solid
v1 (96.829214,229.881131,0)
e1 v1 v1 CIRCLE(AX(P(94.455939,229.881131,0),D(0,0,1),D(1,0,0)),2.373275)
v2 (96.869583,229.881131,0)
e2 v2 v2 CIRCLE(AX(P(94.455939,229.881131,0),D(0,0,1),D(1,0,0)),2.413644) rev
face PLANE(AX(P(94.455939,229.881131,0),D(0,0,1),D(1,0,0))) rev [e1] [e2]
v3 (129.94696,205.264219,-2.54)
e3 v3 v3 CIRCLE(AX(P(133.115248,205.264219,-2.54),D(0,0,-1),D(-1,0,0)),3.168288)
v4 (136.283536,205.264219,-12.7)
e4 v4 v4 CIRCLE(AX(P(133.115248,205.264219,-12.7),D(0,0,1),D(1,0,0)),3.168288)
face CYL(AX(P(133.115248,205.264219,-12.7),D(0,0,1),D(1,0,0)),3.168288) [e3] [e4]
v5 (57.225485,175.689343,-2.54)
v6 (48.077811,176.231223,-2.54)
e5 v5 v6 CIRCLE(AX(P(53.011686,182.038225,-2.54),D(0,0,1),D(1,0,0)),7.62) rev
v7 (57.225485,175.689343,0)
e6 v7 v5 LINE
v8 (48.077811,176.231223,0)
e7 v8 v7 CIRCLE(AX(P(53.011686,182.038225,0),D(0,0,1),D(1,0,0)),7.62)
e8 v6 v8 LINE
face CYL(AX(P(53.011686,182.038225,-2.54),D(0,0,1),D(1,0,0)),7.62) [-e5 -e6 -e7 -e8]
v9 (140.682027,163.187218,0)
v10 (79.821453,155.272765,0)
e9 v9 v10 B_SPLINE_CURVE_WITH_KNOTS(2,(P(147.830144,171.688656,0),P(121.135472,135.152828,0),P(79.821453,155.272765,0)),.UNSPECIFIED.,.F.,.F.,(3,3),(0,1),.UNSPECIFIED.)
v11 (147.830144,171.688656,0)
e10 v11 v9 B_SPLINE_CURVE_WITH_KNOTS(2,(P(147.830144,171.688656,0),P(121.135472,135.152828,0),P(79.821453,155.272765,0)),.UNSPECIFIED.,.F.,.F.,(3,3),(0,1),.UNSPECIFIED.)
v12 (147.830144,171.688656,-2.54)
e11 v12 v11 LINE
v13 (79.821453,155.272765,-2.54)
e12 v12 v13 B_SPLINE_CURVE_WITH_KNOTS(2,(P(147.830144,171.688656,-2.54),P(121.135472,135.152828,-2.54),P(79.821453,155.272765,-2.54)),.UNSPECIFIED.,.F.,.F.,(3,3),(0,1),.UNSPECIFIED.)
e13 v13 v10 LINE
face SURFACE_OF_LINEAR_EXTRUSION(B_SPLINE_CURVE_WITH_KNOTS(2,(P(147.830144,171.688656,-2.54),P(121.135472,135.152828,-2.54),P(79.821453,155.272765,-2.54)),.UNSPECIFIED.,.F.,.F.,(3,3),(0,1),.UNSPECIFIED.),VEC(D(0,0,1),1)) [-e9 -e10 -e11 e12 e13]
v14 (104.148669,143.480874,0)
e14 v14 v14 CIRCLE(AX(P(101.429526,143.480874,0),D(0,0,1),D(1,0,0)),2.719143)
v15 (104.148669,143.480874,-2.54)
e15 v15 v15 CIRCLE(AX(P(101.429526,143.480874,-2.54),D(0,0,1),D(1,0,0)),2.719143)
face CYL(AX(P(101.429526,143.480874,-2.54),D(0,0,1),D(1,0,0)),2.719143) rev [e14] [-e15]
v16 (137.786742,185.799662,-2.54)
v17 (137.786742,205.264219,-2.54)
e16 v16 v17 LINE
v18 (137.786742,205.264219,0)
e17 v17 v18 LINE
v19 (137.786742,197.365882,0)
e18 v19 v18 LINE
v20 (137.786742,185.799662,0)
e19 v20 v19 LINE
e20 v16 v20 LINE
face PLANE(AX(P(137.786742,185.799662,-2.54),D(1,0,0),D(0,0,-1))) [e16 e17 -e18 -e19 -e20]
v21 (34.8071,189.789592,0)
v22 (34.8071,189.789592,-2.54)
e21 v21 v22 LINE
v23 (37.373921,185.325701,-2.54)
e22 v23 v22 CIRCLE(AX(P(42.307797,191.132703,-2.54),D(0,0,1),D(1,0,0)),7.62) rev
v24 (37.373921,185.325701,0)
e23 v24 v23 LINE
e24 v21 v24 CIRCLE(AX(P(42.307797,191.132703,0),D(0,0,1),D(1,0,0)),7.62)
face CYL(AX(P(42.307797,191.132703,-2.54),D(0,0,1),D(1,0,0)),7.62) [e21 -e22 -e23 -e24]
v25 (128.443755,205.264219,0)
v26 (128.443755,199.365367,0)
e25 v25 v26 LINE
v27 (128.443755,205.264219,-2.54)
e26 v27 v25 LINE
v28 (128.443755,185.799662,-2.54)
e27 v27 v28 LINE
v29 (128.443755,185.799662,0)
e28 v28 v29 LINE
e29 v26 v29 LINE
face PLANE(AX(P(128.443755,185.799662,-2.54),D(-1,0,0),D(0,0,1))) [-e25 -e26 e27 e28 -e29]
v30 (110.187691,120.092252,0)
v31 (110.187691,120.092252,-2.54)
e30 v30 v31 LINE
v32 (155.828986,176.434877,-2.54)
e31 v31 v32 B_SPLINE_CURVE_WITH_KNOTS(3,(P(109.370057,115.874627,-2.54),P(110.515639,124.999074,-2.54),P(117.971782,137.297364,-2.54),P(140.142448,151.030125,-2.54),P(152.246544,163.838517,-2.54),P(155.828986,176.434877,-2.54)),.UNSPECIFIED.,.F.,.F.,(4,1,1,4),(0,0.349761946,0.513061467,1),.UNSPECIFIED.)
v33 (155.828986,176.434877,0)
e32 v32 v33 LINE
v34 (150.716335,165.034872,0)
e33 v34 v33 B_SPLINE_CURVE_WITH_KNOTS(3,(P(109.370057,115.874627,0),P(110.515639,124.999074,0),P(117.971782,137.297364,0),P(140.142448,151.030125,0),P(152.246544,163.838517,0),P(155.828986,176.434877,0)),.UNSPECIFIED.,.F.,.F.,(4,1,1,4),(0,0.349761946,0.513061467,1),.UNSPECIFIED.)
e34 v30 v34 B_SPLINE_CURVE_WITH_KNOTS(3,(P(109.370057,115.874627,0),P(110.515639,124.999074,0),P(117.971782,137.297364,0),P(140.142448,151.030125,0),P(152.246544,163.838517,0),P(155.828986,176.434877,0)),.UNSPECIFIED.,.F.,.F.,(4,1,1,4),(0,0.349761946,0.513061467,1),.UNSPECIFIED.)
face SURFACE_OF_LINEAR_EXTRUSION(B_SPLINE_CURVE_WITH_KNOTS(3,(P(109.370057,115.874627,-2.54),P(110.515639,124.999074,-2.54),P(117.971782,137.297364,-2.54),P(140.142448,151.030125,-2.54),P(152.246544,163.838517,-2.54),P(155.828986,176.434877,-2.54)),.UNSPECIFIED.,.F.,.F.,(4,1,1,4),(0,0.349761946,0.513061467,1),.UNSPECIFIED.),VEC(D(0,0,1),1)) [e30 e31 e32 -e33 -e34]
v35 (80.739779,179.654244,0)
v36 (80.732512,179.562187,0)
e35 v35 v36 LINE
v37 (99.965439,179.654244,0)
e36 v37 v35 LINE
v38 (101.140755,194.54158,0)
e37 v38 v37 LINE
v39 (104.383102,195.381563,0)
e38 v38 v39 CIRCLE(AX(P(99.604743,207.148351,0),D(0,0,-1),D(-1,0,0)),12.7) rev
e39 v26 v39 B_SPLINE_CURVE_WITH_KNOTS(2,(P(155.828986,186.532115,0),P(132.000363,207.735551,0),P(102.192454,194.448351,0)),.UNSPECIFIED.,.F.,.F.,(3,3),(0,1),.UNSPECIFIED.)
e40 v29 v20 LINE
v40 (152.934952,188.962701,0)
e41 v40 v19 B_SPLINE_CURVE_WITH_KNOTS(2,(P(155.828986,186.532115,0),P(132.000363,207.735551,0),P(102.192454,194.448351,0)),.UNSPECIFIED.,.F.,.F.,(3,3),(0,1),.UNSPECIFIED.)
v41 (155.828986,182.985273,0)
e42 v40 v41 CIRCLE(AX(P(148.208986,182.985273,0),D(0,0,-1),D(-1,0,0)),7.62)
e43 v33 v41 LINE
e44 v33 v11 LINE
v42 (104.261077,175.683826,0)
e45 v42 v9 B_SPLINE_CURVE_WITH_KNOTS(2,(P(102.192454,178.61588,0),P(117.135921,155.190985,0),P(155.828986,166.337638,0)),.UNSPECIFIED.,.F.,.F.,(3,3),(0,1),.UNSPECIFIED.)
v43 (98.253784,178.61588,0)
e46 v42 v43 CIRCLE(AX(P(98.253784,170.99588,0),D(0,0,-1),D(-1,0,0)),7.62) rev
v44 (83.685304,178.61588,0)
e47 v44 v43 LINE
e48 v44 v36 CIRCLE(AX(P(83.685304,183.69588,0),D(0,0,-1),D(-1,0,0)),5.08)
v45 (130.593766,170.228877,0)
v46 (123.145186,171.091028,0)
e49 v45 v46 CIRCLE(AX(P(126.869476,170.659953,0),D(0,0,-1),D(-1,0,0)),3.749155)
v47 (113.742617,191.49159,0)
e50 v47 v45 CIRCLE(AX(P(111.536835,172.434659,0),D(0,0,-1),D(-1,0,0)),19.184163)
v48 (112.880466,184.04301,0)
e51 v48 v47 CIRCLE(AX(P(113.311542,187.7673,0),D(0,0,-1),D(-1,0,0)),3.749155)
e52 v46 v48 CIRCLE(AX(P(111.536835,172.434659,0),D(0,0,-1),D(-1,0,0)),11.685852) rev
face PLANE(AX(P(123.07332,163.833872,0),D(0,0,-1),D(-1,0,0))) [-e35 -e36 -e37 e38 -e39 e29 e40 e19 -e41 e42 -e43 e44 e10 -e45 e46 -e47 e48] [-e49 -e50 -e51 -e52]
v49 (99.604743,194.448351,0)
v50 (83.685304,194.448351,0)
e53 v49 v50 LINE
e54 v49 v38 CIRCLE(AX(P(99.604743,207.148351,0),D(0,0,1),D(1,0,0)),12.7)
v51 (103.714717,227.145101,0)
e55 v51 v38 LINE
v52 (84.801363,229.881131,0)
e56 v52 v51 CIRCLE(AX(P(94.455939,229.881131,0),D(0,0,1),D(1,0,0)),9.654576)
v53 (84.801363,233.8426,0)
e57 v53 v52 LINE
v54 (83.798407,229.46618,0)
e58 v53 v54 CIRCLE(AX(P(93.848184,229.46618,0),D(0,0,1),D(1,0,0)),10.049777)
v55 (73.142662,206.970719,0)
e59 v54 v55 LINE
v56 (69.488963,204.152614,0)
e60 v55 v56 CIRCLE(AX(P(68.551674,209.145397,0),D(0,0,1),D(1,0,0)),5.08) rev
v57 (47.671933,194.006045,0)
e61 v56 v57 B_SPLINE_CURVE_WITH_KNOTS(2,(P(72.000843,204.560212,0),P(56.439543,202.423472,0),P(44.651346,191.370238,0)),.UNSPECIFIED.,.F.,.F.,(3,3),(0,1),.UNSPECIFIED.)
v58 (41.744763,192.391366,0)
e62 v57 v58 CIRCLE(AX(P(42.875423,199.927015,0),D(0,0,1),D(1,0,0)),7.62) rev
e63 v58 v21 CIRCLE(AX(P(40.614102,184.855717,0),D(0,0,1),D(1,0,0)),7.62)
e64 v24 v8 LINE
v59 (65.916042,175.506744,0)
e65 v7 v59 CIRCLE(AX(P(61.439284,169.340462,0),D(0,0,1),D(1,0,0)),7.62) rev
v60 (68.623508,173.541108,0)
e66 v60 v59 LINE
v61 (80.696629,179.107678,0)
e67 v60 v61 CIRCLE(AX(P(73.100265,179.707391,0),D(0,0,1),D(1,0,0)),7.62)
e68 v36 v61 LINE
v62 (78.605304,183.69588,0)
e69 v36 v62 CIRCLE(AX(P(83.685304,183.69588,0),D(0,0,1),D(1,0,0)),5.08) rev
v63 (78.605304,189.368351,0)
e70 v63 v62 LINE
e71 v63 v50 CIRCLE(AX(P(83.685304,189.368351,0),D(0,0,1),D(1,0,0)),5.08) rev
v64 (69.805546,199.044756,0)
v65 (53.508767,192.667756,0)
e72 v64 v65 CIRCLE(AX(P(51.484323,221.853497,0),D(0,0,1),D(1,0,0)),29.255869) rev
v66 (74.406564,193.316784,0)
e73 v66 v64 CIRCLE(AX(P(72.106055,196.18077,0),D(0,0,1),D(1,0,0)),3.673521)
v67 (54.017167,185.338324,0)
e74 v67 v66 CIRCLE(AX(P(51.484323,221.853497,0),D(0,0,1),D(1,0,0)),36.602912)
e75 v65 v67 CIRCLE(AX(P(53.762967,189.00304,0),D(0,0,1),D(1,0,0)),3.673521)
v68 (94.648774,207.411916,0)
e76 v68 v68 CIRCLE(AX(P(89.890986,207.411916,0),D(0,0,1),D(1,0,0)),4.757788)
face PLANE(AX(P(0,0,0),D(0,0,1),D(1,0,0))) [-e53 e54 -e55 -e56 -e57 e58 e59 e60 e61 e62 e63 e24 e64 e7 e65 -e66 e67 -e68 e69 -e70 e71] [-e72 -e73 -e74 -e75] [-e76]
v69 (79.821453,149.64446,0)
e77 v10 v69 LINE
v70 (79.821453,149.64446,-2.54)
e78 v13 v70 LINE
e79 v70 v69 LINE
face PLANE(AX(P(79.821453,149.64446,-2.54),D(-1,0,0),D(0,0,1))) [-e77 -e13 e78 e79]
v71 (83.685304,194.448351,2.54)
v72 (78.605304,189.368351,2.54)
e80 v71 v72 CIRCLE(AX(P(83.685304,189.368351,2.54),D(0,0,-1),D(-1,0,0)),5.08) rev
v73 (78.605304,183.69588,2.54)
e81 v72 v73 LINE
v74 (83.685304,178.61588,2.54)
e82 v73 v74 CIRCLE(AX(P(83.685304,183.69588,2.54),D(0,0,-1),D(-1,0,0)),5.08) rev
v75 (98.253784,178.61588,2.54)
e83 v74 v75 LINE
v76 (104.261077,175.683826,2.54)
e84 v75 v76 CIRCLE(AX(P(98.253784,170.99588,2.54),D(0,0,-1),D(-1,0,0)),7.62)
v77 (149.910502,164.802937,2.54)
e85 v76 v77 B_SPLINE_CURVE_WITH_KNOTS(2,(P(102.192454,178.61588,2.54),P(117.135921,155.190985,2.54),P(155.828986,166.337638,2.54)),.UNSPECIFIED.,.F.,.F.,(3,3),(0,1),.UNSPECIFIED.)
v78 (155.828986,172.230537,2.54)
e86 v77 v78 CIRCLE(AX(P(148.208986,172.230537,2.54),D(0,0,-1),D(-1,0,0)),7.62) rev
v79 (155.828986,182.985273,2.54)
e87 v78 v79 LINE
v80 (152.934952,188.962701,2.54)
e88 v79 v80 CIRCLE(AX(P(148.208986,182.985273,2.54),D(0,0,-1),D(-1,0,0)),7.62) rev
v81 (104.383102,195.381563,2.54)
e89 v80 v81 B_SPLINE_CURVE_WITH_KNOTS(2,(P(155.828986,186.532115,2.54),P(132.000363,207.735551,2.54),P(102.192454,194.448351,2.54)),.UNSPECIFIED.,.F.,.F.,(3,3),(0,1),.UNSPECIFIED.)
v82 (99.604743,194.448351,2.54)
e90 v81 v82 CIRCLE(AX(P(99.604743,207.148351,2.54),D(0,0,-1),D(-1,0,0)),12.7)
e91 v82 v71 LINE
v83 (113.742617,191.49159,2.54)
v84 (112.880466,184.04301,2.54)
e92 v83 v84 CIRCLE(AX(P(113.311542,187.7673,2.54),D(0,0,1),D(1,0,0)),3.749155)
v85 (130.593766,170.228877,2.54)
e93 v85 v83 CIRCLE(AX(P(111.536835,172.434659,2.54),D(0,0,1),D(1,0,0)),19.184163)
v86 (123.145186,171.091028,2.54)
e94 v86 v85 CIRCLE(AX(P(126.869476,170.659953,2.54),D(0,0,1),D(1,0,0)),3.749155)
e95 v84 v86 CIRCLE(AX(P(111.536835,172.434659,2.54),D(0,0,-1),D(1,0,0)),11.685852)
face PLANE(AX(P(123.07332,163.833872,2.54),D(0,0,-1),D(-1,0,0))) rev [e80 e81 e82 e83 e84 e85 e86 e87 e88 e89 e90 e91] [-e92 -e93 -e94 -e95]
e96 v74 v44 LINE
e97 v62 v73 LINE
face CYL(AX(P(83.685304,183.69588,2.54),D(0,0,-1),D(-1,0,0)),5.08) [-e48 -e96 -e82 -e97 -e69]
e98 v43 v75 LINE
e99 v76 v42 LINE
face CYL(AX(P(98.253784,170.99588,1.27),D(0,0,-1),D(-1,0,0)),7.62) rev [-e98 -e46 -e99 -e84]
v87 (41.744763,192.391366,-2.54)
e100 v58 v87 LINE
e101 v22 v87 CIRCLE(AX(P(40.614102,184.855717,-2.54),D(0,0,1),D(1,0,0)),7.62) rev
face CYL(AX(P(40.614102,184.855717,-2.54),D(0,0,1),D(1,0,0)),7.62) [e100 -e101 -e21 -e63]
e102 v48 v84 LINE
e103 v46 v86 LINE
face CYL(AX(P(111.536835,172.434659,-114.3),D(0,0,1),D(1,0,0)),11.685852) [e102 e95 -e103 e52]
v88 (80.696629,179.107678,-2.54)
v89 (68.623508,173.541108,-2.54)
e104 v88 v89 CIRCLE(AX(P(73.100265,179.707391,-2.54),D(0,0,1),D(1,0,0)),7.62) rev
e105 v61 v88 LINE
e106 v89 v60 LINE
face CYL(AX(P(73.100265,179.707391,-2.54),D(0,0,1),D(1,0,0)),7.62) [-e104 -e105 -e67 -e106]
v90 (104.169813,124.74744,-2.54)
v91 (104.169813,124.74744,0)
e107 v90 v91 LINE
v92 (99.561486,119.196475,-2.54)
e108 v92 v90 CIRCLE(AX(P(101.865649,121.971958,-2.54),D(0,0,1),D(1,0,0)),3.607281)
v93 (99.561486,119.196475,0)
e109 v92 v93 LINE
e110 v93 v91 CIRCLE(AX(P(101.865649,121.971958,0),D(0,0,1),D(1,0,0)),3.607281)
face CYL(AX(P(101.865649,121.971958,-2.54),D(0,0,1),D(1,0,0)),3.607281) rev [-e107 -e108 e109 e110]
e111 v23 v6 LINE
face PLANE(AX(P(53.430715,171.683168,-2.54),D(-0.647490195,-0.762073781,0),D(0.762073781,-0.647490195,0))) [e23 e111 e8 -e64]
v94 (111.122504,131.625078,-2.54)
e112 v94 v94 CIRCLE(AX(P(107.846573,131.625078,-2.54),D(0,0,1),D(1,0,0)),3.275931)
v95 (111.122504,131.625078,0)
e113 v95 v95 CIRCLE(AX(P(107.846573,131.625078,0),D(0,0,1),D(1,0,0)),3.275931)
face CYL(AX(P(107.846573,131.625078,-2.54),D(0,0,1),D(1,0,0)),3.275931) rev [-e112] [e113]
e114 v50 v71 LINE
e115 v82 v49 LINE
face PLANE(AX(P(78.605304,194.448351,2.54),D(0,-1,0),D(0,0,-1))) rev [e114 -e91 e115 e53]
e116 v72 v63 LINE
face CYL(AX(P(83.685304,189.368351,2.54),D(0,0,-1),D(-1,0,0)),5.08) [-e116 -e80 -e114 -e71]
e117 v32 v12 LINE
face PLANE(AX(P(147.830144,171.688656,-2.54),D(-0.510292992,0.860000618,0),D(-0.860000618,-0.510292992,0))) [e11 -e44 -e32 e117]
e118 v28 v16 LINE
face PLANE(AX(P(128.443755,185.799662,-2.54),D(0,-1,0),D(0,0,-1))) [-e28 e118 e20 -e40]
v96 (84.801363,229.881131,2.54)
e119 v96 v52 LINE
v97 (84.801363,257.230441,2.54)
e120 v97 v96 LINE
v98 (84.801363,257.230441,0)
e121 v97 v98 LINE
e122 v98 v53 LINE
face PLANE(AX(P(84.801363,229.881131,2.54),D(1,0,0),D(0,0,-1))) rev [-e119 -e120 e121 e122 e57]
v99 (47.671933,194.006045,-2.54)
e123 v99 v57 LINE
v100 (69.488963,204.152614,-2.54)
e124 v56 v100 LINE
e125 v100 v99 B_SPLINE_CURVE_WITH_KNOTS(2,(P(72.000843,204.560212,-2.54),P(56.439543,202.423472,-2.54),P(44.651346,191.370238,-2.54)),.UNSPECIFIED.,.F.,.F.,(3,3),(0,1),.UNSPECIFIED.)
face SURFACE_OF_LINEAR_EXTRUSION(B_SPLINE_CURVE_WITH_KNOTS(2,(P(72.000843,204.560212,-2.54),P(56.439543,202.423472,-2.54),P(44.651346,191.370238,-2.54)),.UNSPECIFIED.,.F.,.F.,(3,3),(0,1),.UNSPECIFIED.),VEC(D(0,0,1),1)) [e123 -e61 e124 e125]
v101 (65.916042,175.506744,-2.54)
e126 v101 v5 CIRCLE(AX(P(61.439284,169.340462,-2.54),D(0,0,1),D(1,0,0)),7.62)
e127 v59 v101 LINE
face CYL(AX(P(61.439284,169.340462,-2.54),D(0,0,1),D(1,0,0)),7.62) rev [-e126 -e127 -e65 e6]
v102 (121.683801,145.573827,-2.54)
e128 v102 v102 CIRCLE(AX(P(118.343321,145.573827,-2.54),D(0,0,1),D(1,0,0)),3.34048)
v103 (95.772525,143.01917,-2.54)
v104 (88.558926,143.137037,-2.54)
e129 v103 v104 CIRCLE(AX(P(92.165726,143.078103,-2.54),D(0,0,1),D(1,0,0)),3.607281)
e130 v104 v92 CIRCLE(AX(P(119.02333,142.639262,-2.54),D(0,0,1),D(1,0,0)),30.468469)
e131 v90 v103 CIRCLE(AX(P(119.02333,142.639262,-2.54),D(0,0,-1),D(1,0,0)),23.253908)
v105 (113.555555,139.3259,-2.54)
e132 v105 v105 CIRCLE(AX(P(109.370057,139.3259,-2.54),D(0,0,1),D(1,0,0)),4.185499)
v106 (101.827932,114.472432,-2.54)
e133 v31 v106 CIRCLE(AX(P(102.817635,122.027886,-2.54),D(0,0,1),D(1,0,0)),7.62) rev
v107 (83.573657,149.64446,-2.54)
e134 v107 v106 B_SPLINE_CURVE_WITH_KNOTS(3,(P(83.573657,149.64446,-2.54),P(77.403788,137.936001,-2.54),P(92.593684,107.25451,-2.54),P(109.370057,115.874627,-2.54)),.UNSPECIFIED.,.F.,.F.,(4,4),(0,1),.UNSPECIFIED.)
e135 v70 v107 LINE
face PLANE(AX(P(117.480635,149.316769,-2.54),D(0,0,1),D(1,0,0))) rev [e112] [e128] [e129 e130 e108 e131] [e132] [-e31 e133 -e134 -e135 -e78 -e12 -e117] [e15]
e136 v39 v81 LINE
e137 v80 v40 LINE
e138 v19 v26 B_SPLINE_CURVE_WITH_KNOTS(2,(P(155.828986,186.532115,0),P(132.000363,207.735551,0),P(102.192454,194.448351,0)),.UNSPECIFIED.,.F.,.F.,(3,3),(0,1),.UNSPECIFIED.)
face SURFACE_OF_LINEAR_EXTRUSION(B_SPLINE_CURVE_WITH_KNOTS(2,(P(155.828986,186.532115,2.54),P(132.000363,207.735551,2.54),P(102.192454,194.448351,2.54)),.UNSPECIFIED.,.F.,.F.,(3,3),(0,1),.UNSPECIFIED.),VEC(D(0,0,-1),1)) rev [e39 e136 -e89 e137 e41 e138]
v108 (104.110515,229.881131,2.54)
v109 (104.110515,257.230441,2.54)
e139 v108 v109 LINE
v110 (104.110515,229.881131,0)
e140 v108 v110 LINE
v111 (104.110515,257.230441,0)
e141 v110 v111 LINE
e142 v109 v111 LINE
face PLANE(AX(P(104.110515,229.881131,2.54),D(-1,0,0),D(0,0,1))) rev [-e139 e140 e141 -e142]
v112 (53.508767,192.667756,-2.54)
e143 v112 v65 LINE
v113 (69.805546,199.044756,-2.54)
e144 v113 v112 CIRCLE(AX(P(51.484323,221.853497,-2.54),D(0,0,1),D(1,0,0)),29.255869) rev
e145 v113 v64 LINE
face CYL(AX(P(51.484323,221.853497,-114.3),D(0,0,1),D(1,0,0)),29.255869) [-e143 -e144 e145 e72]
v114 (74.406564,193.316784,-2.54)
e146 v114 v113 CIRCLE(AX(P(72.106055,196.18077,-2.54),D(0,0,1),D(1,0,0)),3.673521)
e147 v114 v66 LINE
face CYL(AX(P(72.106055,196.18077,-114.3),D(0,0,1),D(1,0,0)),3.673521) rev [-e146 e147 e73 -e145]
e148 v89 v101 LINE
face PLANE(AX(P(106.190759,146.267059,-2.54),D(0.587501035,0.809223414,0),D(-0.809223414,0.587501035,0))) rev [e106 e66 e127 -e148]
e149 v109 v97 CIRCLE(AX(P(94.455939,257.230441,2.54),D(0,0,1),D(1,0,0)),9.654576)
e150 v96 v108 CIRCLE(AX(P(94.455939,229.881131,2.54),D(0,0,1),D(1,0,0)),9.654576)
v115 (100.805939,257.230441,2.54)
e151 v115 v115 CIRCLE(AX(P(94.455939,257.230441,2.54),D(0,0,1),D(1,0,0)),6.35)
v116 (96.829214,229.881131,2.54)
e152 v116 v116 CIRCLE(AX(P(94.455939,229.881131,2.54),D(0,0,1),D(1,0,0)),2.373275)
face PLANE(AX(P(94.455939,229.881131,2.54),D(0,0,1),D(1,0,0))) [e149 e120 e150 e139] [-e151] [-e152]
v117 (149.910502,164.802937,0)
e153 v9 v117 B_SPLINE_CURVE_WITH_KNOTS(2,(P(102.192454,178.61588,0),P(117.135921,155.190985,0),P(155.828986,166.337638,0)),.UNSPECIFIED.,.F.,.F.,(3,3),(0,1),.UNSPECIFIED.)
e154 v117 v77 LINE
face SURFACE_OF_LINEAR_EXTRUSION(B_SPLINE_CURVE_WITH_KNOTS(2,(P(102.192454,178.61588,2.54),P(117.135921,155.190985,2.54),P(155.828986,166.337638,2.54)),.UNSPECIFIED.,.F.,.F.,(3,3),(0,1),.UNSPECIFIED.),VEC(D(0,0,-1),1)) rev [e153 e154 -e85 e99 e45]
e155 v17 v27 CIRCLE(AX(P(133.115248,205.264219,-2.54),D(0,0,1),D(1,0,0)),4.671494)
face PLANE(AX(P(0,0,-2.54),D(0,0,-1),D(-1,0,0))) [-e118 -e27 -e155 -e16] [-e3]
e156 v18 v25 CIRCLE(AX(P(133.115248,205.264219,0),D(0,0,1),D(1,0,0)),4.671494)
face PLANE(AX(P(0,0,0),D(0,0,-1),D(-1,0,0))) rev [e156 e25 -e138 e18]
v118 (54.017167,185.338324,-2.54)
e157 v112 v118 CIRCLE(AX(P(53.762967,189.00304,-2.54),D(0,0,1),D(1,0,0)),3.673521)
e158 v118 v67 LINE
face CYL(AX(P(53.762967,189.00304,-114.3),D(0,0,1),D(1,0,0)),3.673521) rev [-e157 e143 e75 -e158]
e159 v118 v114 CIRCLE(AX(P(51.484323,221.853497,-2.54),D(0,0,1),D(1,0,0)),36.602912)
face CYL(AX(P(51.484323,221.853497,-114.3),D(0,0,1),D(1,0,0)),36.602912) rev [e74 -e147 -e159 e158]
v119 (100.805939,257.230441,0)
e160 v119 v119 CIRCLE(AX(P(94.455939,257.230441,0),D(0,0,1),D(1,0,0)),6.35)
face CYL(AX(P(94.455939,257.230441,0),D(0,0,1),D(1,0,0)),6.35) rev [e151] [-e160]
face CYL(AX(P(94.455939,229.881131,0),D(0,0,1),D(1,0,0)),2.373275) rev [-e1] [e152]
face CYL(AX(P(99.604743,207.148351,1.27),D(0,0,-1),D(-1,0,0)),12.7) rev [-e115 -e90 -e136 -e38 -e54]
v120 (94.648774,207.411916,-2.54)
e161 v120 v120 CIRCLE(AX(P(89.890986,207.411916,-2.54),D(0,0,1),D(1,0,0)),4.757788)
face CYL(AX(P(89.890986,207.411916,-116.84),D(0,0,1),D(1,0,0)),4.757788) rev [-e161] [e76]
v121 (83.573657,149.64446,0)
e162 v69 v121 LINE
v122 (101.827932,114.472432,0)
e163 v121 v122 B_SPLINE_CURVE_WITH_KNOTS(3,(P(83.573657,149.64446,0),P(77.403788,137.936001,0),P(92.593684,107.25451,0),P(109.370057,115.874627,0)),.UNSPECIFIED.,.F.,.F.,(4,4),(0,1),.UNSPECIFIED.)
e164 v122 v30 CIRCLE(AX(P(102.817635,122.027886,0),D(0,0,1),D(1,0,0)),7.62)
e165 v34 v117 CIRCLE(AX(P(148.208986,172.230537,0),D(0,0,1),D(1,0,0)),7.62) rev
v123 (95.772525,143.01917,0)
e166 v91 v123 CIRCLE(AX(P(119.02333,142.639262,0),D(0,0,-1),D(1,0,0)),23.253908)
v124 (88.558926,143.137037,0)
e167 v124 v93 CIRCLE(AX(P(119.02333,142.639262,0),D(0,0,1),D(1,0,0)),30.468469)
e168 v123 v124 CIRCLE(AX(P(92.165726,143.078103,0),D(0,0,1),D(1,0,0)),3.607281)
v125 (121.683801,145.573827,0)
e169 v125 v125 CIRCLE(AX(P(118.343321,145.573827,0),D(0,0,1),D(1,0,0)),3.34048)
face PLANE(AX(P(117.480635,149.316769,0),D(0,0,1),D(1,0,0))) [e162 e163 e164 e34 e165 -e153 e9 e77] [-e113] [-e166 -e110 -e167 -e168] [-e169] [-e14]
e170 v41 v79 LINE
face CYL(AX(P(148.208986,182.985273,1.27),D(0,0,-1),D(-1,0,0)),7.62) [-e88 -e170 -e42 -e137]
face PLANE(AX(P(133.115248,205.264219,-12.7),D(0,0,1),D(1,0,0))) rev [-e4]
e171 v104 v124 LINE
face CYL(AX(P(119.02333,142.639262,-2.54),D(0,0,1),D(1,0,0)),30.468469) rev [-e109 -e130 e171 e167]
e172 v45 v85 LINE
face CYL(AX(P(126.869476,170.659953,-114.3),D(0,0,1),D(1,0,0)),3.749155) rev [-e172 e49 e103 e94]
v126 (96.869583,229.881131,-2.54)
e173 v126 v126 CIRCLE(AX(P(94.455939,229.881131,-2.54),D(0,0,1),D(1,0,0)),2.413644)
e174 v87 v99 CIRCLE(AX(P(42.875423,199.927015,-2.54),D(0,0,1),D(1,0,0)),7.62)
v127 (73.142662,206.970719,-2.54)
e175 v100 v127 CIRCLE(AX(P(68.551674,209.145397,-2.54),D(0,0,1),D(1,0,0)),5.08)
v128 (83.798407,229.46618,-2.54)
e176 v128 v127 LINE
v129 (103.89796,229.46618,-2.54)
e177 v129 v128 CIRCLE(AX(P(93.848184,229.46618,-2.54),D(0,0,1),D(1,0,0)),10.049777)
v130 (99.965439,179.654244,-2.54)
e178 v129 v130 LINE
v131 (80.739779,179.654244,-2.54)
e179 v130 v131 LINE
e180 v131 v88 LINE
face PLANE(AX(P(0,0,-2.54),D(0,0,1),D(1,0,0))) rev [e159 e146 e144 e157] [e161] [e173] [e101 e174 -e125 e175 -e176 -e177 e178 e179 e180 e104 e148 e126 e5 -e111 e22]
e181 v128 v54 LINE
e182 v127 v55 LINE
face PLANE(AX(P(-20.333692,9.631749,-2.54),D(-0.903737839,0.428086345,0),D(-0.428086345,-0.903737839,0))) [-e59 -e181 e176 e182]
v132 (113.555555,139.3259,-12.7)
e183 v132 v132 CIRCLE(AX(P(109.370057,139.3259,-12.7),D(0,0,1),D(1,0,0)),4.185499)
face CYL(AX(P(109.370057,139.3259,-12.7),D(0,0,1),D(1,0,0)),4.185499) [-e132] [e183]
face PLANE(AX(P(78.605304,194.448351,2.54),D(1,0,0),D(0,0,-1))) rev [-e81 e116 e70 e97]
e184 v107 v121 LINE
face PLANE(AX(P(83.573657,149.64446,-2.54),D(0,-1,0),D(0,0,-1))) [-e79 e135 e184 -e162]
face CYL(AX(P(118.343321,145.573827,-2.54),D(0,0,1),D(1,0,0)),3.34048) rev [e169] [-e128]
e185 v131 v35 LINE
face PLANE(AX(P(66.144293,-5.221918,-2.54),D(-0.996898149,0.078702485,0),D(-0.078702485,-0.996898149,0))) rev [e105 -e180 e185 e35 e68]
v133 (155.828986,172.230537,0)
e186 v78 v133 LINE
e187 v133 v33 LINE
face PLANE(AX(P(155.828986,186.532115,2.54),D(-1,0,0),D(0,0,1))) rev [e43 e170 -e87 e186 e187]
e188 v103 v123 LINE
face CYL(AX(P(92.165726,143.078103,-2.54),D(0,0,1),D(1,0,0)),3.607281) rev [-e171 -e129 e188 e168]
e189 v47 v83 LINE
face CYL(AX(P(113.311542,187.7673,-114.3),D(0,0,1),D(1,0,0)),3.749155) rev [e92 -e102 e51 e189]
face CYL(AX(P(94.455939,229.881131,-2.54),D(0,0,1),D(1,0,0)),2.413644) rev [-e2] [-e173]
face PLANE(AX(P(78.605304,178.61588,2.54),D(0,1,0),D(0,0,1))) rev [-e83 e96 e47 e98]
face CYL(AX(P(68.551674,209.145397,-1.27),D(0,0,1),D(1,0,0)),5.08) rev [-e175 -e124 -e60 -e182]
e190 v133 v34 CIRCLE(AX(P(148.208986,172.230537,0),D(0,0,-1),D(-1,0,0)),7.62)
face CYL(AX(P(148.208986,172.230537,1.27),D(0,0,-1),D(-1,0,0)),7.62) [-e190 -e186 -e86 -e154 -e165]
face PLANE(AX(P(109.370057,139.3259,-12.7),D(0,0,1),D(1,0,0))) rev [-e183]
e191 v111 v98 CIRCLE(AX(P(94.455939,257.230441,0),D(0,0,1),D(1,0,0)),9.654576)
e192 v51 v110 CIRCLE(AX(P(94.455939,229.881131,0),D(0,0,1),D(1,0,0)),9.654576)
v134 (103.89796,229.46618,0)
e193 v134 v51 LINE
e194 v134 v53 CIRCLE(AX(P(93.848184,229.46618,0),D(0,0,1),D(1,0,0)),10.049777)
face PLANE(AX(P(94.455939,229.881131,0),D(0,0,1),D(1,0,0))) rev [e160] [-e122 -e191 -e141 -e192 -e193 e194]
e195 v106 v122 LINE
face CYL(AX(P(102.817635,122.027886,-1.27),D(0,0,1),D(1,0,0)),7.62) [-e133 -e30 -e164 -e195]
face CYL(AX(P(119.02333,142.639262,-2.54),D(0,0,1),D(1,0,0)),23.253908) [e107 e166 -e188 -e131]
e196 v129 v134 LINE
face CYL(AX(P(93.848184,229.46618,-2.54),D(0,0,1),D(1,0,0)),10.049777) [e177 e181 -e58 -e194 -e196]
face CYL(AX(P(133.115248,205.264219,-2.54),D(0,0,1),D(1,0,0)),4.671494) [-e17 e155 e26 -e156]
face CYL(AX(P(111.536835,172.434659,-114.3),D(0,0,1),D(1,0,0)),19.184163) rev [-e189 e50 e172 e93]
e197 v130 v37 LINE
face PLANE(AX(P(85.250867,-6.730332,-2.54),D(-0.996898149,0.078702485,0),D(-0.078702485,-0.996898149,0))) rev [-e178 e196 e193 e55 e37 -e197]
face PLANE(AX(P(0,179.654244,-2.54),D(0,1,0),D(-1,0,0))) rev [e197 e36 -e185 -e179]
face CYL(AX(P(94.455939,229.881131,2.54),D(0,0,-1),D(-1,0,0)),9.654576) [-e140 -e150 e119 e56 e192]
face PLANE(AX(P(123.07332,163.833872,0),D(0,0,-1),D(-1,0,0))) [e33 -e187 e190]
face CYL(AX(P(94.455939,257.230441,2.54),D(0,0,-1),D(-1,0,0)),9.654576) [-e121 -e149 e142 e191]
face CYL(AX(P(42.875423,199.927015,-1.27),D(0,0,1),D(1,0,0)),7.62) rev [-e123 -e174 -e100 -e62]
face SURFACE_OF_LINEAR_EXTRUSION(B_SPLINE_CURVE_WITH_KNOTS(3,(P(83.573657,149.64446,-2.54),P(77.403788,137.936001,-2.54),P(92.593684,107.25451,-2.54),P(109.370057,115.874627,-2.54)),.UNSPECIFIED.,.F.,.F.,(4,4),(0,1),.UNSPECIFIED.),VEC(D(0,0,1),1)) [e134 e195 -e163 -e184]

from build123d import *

# Parameters (mm, degrees)
BOSS_EXTRUDE1_DEPTH = 2.54
BOSS_EXTRUDE2_DEPTH = 2.54
SKETCH4_R           = 3.752203663949133
BOSS_EXTRUDE3_DEPTH = 2.54
SKETCH5_W           = 9.342987123233343
SKETCH5_H           = 19.464556506736216
BOSS_EXTRUDE4_DEPTH = 2.54
SKETCH6_R           = 4.671493561616677
BOSS_EXTRUDE5_DEPTH = 2.54
SKETCH7_R           = 1.325280210362921
CUT_EXTRUDE1_DEPTH  = 2.54
BOSS_EXTRUDE6_DEPTH = 2.54
SKETCH9_R           = 2.413643935948342
CUT_EXTRUDE2_DEPTH  = 2.54
BOSS_EXTRUDE7_DEPTH = 2.54
SKETCH12_R          = 6.349999999999994
CUT_EXTRUDE3_DEPTH  = 2.54
SKETCH13_R          = 2.373275093168991
CUT_EXTRUDE4_DEPTH  = 2.54
SKETCH14_R          = 3.1682877443280404
BOSS_EXTRUDE8_DEPTH = 12.699999999999996
SKETCH15_R          = 4.185498605643885
BOSS_EXTRUDE9_DEPTH = 12.699999999999996
FILLET1_R           = 5.08
FILLET2_R           = 5.08
FILLET3_R           = 7.62
FILLET4_R           = 7.62
FILLET5_R           = 12.7
FILLET6_R           = 7.62
FILLET7_R           = 7.62
FILLET8_R           = 7.62
FILLET9_R           = 7.62
FILLET10_R          = 7.62
CUT_EXTRUDE5_DEPTH  = 116.84000000000003
SKETCH17_R          = 4.757787793991487
SKETCH17_R_2        = 3.9759258529414856
CUT_EXTRUDE6_DEPTH  = 116.84000000000003
SKETCH18_R          = 3.3404799409440606
SKETCH18_R_2        = 3.275931204973612
SKETCH18_R_3        = 2.7191431381646294
CUT_EXTRUDE7_DEPTH  = 2.54


with BuildPart() as part:
    # Sketch2 → Boss-Extrude1 (new body)
    with BuildSketch(Plane.XY):
        with BuildLine():
            Line((103.77346184597248, 227.8892023486803), (103.8979601103844, 229.46618036456462))
            ThreePointArc((103.89796011038442, 229.46618036456462), (93.8481835442449, 239.51595693070414), (83.79840697810539, 229.46618036456462))
            Line((83.79840697810539, 229.46618036456462), (60.20327938803871, 179.65424434109062))
            Line((60.20327938803871, 179.65424434109062), (79.62651223852446, 165.55286121354592))
            Line((79.62651223852446, 165.55286121354592), (80.73977932754117, 179.65424434109053))
            Line((80.73977932754117, 179.65424434109053), (99.9654388453732, 179.65424434109056))
            Line((99.9654388453732, 179.65424434109056), (103.77346184597248, 227.8892023486803))
        make_face()
    extrude(amount=-BOSS_EXTRUDE1_DEPTH)

    # Sketch3 → Boss-Extrude2 (add)
    with BuildSketch(Plane.XY):
        with BuildLine():
            Line((155.82898557173152, 186.53211543759366), (155.82898557173152, 166.33763806185485))
            add(Edge.make_bspline(
                [(102.19245366176918, 178.61588030630404), (117.13592129843231, 155.19098509207532), (155.82898557173152, 166.33763806185485)],
                knots=[0, 0, 0, 1, 1, 1], degree=2))
            Line((102.19245366176918, 178.61588030630404), (78.60530408690622, 178.61588030630404))
            Line((78.60530408690622, 178.61588030630404), (78.60530408690622, 194.44835056888326))
            Line((78.60530408690622, 194.44835056888326), (102.19245366176918, 194.44835056888326))
            add(Edge.make_bspline(
                [(102.19245366176918, 194.44835056888326), (132.00036256606023, 207.73555116297914), (155.82898557173152, 186.53211543759366)],
                knots=[0, 0, 0, 1, 1, 1], degree=2))
        make_face()
    extrude(amount=BOSS_EXTRUDE2_DEPTH)

    # Sketch4 → Boss-Extrude3 (add)
    with BuildSketch(Plane.XY):
        with BuildLine():
            Line((83.57365654515331, 149.6444596246894), (79.82145288120418, 149.6444596246894))
            Line((79.82145288120418, 149.6444596246894), (79.82145288120418, 155.27276512061312))
            add(Edge.make_bspline(
                [(147.83014429028253, 171.68865615039067), (121.13547228987983, 135.15282767492383), (79.82145288120418, 155.27276512061312)],
                knots=[0, 0, 0, 1, 1, 1], degree=2))
            Line((147.83014429028253, 171.68865615039067), (155.82898557173152, 176.43487674972425))
            add(Edge.make_bspline(
                [(155.82898557173152, 176.43487674972425), (152.24654443646537, 163.8385168089645), (140.14244762403558, 151.03012493854882), (117.9717822507304, 137.2973644996843), (110.51563949256088, 124.99907391139158), (109.37005673480373, 115.874626649147)],
                knots=[0, 0, 0, 0, 0.4869385329698446, 0.6502380535718314, 1, 1, 1, 1], degree=3))
            add(Edge.make_bspline(
                [(109.37005673480373, 115.874626649147), (92.59368388223713, 107.25450975508488), (77.4037881660434, 137.93600075089722), (83.57365654515331, 149.6444596246894)],
                knots=[0, 0, 0, 0, 1, 1, 1, 1], degree=3))
        make_face()
        with Locations((109.37005673480374, 139.32589954882923)):
            Circle(SKETCH4_R, mode=Mode.SUBTRACT)
        with BuildLine():
            ThreePointArc((88.55892647954366, 143.1370366742894), (91.33858373499741, 129.91595744255534), (99.56148602237059, 119.19647478330826))
            ThreePointArc((99.56148602237059, 119.19647478330826), (104.64113222666154, 119.66779421852958), (104.16981279144024, 124.74744042282053))
            ThreePointArc((104.16981279144024, 124.74744042282053), (97.89399330260235, 132.92868055338437), (95.77252492484313, 143.01916975126733))
            ThreePointArc((95.77252492484313, 143.01916975126733), (92.22465916370442, 146.6849024354281), (88.55892647954366, 143.1370366742894))
        make_face(mode=Mode.SUBTRACT)
    extrude(amount=-BOSS_EXTRUDE3_DEPTH)

    # Sketch5 → Boss-Extrude4 (add)
    with BuildSketch(Plane.XY):
        with Locations((133.11524820639553, 195.53194055525648)):
            Rectangle(SKETCH5_W, SKETCH5_H)
    extrude(amount=-BOSS_EXTRUDE4_DEPTH)

    # Sketch6 → Boss-Extrude5 (add)
    with BuildSketch(Plane.XY):
        with Locations((133.11524820639553, 205.2642188086246)):
            Circle(SKETCH6_R)
    extrude(amount=-BOSS_EXTRUDE5_DEPTH)

    # Sketch7 → Cut-Extrude1 (cut)
    with BuildSketch(Plane.XY):
        with Locations((133.11524820639553, 205.2642188086246)):
            Circle(SKETCH7_R)
    extrude(amount=-CUT_EXTRUDE1_DEPTH, mode=Mode.SUBTRACT)

    # Sketch8 → Boss-Extrude6 (add)
    with BuildSketch(Plane.XY):
        with BuildLine():
            Line((53.43071516454814, 171.68316822779136), (33.68058159040789, 188.46371907841157))
            Line((33.68058159040789, 188.46371907841157), (38.612605943121544, 194.2685428070323))
            Line((38.612605943121544, 194.2685428070323), (44.65134602108127, 191.37023842829282))
            add(Edge.make_bspline(
                [(72.00084318307205, 204.56021235282762), (56.43954312103958, 202.4234723925359), (44.65134602108127, 191.37023842829282)],
                knots=[0, 0, 0, 1, 1, 1], degree=2))
            Line((72.00084318307205, 204.56021235282762), (60.20327938803871, 179.65424434109062))
            add(Edge.make_bspline(
                [(60.20327938803871, 179.65424434109062), (56.81699727629342, 175.668706284441), (53.43071516454814, 171.68316822779136)],
                knots=[0, 0, 0, 1, 1, 1], degree=2))
        make_face()
    extrude(amount=-BOSS_EXTRUDE6_DEPTH)

    # Sketch9 → Cut-Extrude2 (cut)
    with BuildSketch(Plane.XY):
        with Locations((94.4559388798138, 229.88113108062512)):
            Circle(SKETCH9_R)
    extrude(amount=-CUT_EXTRUDE2_DEPTH, mode=Mode.SUBTRACT)

    # Sketch11 → Boss-Extrude7 (add)
    with BuildSketch(Plane.XY):
        with BuildLine():
            Line((84.80136313602057, 229.88113108062512), (84.80136313602057, 257.23044134716133))
            ThreePointArc((84.80136313602057, 257.23044134716133), (94.4559388798138, 266.88501709095453), (104.11051462360702, 257.23044134716133))
            Line((104.11051462360702, 257.23044134716133), (104.11051462360702, 229.88113108062512))
            ThreePointArc((104.11051462360702, 229.88113108062512), (94.4559388798138, 220.2265553368319), (84.80136313602057, 229.88113108062512))
        make_face()
    extrude(amount=BOSS_EXTRUDE7_DEPTH)

    # Sketch12 → Cut-Extrude3 (cut)
    with BuildSketch(Plane.XY.offset(2.54)):
        with Locations((94.4559388798138, 257.23044134716133)):
            Circle(SKETCH12_R)
    extrude(amount=-CUT_EXTRUDE3_DEPTH, mode=Mode.SUBTRACT)

    # Sketch13 → Cut-Extrude4 (cut)
    with BuildSketch(Plane.XY.offset(2.54)):
        with Locations((94.4559388798138, 229.88113108062512)):
            Circle(SKETCH13_R)
    extrude(amount=-CUT_EXTRUDE4_DEPTH, mode=Mode.SUBTRACT)

    # Sketch14 → Boss-Extrude8 (add)
    with BuildSketch(Plane.XY):
        with Locations((133.11524820639553, 205.2642188086246)):
            Circle(SKETCH14_R)
    extrude(amount=-BOSS_EXTRUDE8_DEPTH)

    # Sketch15 → Boss-Extrude9 (add)
    with BuildSketch(Plane.XY):
        with Locations((109.37005673480374, 139.32589954882923)):
            Circle(SKETCH15_R)
    extrude(amount=-BOSS_EXTRUDE9_DEPTH)

    # Fillet1
    # the kernel refuses this fillet: 5.08 mm, written as the material it takes off along each edge
    with BuildSketch(Plane(origin=(78.60530408690622, 194.44835056888326, 0), x_dir=(1, 0, 0), z_dir=(0, 0, 1))) as fillet1_piece_1:
        with BuildLine():
            CenterArc((FILLET1_R, -FILLET1_R), FILLET1_R, 90, 90)
            Line((0, -FILLET1_R), (0, 0))
            Line((0, 0), (FILLET1_R, 0))
        make_face()
    extrude(amount=15.240000000000032, mode=Mode.SUBTRACT)
    with BuildSketch(Plane(origin=(78.60530408690622, 178.61588030630404, 0), x_dir=(0, 1, 0), z_dir=(0, 0, 1))) as fillet1_piece_2:
        with BuildLine():
            CenterArc((FILLET1_R, -FILLET1_R), FILLET1_R, 90, 90)
            Line((0, -FILLET1_R), (0, 0))
            Line((0, 0), (FILLET1_R, 0))
        make_face()
    extrude(amount=15.240000000000032, mode=Mode.SUBTRACT)

    # Fillet2
    fillet2_edges = [part.edges().sort_by_distance(p)[0] for p in [
        (72.00084318307205, 204.56021235282762, -1.27),
    ]]
    fillet(fillet2_edges, radius=FILLET2_R)

    # Fillet3
    fillet3_edges = [part.edges().sort_by_distance(p)[0] for p in [
        (79.62651223852446, 165.55286121354592, -1.27),
        (60.20327938803871, 179.65424434109062, -1.27),
    ]]
    fillet(fillet3_edges, radius=FILLET3_R)

    # Fillet4
    fillet4_edges = [part.edges().sort_by_distance(p)[0] for p in [
        (102.19245366176918, 178.61588030630404, 1.27),
    ]]
    fillet(fillet4_edges, radius=FILLET4_R)

    # Fillet5
    # the kernel refuses this fillet: 12.7 mm, written as the material it adds along each edge
    with BuildSketch(Plane(origin=(102.19245366176918, 194.44835056888326, 0), x_dir=(-1, 0, 0), z_dir=(0, 0, 1))) as fillet5_piece_1:
        with BuildLine():
            CenterArc((2.5877110332677518, -12.699999999999989), FILLET5_R, 90, 22.101513861173345)
            Line((-2.1906480107007127, -0.9332126369630771), (-2.2862151915800837, -0.6978768897023429))
            ThreePointArc((-2.2862151915800837, -0.6978768897023429), (-1.190974963774508, -0.2421295183060579), (-0.10341414363983858, 0.23199464410896553))
            Line((-0.10341414363983858, 0.23199464410896553), (0, 0.2539999999999907))
            Line((0, 0.2539999999999907), (2.5877110332677518, 0.2539999999999907))
            Line((2.5877110332677518, 0.2539999999999907), (2.5877110332677518, 0))
        make_face()
    extrude(amount=2.54)

    # Fillet6
    # the kernel refuses this fillet: 7.62 mm, written as the material it takes off along each edge
    with BuildSketch(Plane(origin=(155.82898557173152, 166.33763806185485, 0), x_dir=(-0.9679857951483454, -0.25100498080919764, 0), z_dir=(0, 0, 1))) as fillet6_piece_1:
        with BuildLine():
            CenterArc((5.896904780664992, -7.616900393013502), FILLET6_R, 88.36571353920408, 77.09729672812531)
            Line((-1.4791469783654112, -5.704242439247442), (-1.6266680135460192, -5.665989280172121))
            Line((-1.6266680135460192, -5.665989280172121), (-0.1475210351806079, 0.03825315907532174))
            Line((-0.1475210351806079, 0.03825315907532174), (-0.00407865923253817, 0.15234541193900156))
            ThreePointArc((-0.00407865923253817, 0.15234541193900156), (3.057027412711964, 0.19461408438494718), (6.118572167505086, 0.15233800786026397))
            Line((6.118572167505086, 0.15233800786026397), (6.114225748155272, -3e-17))
        make_face()
    extrude(amount=2.54, mode=Mode.SUBTRACT)
    with BuildSketch(Plane(origin=(155.82898557173152, 186.53211543759366, 0), x_dir=(0, -1, 0), z_dir=(0, 0, 1))) as fillet6_piece_2:
        with BuildLine():
            CenterArc((3.546842511676118, -7.6200000000000045), FILLET6_R, 90, 51.66885560817448)
            Line((-2.430585411298921, -2.8940339161565873), (-2.550133969758434, -2.7995145944797173))
            ThreePointArc((-2.550133969758434, -2.7995145944797173), (-1.353004934943982, -1.3313000635790786), (-0.11385193149305906, 0.10130892209127751))
            Line((-0.11385193149305906, 0.10130892209127751), (0, 0.1524000000000001))
            Line((0, 0.1524000000000001), (3.546842511676118, 0.1524000000000001))
            Line((3.546842511676118, 0.1524000000000001), (3.546842511676118, 0))
        make_face()
    extrude(amount=2.54, mode=Mode.SUBTRACT)

    # Fillet7
    fillet7_edges = [part.edges().sort_by_distance(p)[0] for p in [
        (38.612605943121544, 194.2685428070323, -1.27),
    ]]
    fillet(fillet7_edges, radius=FILLET7_R)

    # Fillet8
    # the kernel refuses this fillet: 7.62 mm, written as the material it takes off along each edge
    with BuildSketch(Plane(origin=(33.68058159040789, 188.46371907841157, 12.116083147258706), x_dir=(0.6474901947470975, 0.7620737810122887, 0), z_dir=(0, 0, -1))) as fillet8_piece_1:
        with BuildLine():
            CenterArc((7.620000000000027, 4.846433258903447), FILLET8_R, 179.99999999999974, 39.495295691095976)
            Line((3.16e-14, 4.846433258903483), (-0.15239999999997533, 4.846433258903493))
            Line((-0.15239999999997533, 4.846433258903493), (-0.15240000000000672, 1.022e-14))
            Line((-0.15240000000000672, 1.022e-14), (4.39e-15, -0.1524000000000005))
            ThreePointArc((4.39e-15, -0.1524000000000005), (0.8699113675352202, -0.15239999999999398), (1.6222191897718603, -0.0969286651780648))
            Line((1.6222191897718603, -0.0969286651780648), (1.7398227350704578, 5e-17))
        make_face()
    extrude(amount=26.77216629451741, mode=Mode.SUBTRACT)
    with BuildSketch(Plane(origin=(53.43071516454814, 171.68316822779136, 17.560321988836655), x_dir=(-0.762073781012292, 0.6474901947470937, 0), z_dir=(0, 0, -1))) as fillet8_piece_2:
        with BuildLine():
            CenterArc((7.024128795534659, 7.619999999999995), FILLET8_R, 196.07483951798156, 73.92516048201844)
            Line((-0.29793560223265597, 5.510077500250723), (-1.0301420420093952, 5.299085250275792))
            ThreePointArc((-1.0301420420093952, 5.299085250275792), (-0.7620000000000109, 3.4001550005014014), (-0.7619999999999949, 5.12e-15))
            Line((-0.7619999999999949, 5.12e-15), (2.8e-16, -0.7619999999999995))
            Line((2.8e-16, -0.7619999999999995), (7.024128795534662, -0.761999999999999))
            Line((7.024128795534662, -0.761999999999999), (7.024128795534661, 3.3e-16))
        make_face()
    extrude(amount=37.66064397767332, mode=Mode.SUBTRACT)

    # Fillet9
    fillet9_edges = [part.edges().sort_by_distance(p)[0] for p in [
        (44.65134602108127, 191.37023842829282, -1.27),
    ]]
    fillet(fillet9_edges, radius=FILLET9_R)

    # Fillet10
    fillet10_edges = [part.edges().sort_by_distance(p)[0] for p in [
        (109.37005673480373, 115.874626649147, -1.27),
    ]]
    fillet(fillet10_edges, radius=FILLET10_R)

    # Sketch16 → Cut-Extrude5 (cut)
    with BuildSketch(Plane.XY.offset(2.54)):
        with BuildLine():
            ThreePointArc((54.017167352012386, 185.33832442812775), (64.8224002068095, 187.76729999516277), (74.4065644751728, 193.31678417197313))
            ThreePointArc((74.4065644751728, 193.31678417197313), (74.97004100476144, 198.4812795822629), (69.80554559447164, 199.04475611185157))
            ThreePointArc((69.80554559447164, 199.04475611185157), (62.145142611882406, 194.60918051553202), (53.5087674756918, 192.66775597841595))
            ThreePointArc((53.5087674756918, 192.66775597841595), (50.09825163870801, 188.74884026511157), (54.017167352012386, 185.33832442812775))
        make_face()
        with BuildLine():
            ThreePointArc((130.59376642914836, 170.2288772991989), (126.57184378059279, 184.35022115468092), (113.74261700271303, 191.49159037615783))
            ThreePointArc((113.74261700271303, 191.49159037615783), (109.58725133861516, 188.1983752782656), (112.88046643650742, 184.04300961416774))
            ThreePointArc((112.88046643650742, 184.04300961416774), (120.69526930180612, 179.69291169942989), (123.14518566715829, 171.09102786540453))
            ThreePointArc((123.14518566715829, 171.09102786540453), (126.4384007650505, 166.93566220130668), (130.59376642914836, 170.2288772991989))
        make_face()
    extrude(amount=-CUT_EXTRUDE5_DEPTH, mode=Mode.SUBTRACT)

    # Sketch17 → Cut-Extrude6 (cut)
    with BuildSketch(Plane.XY):
        with Locations((89.89098617833235, 207.41191613502963)):
            Circle(SKETCH17_R)
        with Locations((143.47476600677567, 182.50994894393102)):
            Circle(SKETCH17_R_2)
    extrude(amount=-CUT_EXTRUDE6_DEPTH, mode=Mode.SUBTRACT)

    # Sketch18 → Cut-Extrude7 (cut)
    with BuildSketch(Plane.XY):
        with Locations((118.3433209479432, 145.57382701559618)):
            Circle(SKETCH18_R)
        with Locations((107.84657264652253, 131.6250776616812)):
            Circle(SKETCH18_R_2)
        with Locations((101.42952598964428, 143.48087429686984)):
            Circle(SKETCH18_R_3)
    extrude(amount=-CUT_EXTRUDE7_DEPTH, mode=Mode.SUBTRACT)


solid = part.part
